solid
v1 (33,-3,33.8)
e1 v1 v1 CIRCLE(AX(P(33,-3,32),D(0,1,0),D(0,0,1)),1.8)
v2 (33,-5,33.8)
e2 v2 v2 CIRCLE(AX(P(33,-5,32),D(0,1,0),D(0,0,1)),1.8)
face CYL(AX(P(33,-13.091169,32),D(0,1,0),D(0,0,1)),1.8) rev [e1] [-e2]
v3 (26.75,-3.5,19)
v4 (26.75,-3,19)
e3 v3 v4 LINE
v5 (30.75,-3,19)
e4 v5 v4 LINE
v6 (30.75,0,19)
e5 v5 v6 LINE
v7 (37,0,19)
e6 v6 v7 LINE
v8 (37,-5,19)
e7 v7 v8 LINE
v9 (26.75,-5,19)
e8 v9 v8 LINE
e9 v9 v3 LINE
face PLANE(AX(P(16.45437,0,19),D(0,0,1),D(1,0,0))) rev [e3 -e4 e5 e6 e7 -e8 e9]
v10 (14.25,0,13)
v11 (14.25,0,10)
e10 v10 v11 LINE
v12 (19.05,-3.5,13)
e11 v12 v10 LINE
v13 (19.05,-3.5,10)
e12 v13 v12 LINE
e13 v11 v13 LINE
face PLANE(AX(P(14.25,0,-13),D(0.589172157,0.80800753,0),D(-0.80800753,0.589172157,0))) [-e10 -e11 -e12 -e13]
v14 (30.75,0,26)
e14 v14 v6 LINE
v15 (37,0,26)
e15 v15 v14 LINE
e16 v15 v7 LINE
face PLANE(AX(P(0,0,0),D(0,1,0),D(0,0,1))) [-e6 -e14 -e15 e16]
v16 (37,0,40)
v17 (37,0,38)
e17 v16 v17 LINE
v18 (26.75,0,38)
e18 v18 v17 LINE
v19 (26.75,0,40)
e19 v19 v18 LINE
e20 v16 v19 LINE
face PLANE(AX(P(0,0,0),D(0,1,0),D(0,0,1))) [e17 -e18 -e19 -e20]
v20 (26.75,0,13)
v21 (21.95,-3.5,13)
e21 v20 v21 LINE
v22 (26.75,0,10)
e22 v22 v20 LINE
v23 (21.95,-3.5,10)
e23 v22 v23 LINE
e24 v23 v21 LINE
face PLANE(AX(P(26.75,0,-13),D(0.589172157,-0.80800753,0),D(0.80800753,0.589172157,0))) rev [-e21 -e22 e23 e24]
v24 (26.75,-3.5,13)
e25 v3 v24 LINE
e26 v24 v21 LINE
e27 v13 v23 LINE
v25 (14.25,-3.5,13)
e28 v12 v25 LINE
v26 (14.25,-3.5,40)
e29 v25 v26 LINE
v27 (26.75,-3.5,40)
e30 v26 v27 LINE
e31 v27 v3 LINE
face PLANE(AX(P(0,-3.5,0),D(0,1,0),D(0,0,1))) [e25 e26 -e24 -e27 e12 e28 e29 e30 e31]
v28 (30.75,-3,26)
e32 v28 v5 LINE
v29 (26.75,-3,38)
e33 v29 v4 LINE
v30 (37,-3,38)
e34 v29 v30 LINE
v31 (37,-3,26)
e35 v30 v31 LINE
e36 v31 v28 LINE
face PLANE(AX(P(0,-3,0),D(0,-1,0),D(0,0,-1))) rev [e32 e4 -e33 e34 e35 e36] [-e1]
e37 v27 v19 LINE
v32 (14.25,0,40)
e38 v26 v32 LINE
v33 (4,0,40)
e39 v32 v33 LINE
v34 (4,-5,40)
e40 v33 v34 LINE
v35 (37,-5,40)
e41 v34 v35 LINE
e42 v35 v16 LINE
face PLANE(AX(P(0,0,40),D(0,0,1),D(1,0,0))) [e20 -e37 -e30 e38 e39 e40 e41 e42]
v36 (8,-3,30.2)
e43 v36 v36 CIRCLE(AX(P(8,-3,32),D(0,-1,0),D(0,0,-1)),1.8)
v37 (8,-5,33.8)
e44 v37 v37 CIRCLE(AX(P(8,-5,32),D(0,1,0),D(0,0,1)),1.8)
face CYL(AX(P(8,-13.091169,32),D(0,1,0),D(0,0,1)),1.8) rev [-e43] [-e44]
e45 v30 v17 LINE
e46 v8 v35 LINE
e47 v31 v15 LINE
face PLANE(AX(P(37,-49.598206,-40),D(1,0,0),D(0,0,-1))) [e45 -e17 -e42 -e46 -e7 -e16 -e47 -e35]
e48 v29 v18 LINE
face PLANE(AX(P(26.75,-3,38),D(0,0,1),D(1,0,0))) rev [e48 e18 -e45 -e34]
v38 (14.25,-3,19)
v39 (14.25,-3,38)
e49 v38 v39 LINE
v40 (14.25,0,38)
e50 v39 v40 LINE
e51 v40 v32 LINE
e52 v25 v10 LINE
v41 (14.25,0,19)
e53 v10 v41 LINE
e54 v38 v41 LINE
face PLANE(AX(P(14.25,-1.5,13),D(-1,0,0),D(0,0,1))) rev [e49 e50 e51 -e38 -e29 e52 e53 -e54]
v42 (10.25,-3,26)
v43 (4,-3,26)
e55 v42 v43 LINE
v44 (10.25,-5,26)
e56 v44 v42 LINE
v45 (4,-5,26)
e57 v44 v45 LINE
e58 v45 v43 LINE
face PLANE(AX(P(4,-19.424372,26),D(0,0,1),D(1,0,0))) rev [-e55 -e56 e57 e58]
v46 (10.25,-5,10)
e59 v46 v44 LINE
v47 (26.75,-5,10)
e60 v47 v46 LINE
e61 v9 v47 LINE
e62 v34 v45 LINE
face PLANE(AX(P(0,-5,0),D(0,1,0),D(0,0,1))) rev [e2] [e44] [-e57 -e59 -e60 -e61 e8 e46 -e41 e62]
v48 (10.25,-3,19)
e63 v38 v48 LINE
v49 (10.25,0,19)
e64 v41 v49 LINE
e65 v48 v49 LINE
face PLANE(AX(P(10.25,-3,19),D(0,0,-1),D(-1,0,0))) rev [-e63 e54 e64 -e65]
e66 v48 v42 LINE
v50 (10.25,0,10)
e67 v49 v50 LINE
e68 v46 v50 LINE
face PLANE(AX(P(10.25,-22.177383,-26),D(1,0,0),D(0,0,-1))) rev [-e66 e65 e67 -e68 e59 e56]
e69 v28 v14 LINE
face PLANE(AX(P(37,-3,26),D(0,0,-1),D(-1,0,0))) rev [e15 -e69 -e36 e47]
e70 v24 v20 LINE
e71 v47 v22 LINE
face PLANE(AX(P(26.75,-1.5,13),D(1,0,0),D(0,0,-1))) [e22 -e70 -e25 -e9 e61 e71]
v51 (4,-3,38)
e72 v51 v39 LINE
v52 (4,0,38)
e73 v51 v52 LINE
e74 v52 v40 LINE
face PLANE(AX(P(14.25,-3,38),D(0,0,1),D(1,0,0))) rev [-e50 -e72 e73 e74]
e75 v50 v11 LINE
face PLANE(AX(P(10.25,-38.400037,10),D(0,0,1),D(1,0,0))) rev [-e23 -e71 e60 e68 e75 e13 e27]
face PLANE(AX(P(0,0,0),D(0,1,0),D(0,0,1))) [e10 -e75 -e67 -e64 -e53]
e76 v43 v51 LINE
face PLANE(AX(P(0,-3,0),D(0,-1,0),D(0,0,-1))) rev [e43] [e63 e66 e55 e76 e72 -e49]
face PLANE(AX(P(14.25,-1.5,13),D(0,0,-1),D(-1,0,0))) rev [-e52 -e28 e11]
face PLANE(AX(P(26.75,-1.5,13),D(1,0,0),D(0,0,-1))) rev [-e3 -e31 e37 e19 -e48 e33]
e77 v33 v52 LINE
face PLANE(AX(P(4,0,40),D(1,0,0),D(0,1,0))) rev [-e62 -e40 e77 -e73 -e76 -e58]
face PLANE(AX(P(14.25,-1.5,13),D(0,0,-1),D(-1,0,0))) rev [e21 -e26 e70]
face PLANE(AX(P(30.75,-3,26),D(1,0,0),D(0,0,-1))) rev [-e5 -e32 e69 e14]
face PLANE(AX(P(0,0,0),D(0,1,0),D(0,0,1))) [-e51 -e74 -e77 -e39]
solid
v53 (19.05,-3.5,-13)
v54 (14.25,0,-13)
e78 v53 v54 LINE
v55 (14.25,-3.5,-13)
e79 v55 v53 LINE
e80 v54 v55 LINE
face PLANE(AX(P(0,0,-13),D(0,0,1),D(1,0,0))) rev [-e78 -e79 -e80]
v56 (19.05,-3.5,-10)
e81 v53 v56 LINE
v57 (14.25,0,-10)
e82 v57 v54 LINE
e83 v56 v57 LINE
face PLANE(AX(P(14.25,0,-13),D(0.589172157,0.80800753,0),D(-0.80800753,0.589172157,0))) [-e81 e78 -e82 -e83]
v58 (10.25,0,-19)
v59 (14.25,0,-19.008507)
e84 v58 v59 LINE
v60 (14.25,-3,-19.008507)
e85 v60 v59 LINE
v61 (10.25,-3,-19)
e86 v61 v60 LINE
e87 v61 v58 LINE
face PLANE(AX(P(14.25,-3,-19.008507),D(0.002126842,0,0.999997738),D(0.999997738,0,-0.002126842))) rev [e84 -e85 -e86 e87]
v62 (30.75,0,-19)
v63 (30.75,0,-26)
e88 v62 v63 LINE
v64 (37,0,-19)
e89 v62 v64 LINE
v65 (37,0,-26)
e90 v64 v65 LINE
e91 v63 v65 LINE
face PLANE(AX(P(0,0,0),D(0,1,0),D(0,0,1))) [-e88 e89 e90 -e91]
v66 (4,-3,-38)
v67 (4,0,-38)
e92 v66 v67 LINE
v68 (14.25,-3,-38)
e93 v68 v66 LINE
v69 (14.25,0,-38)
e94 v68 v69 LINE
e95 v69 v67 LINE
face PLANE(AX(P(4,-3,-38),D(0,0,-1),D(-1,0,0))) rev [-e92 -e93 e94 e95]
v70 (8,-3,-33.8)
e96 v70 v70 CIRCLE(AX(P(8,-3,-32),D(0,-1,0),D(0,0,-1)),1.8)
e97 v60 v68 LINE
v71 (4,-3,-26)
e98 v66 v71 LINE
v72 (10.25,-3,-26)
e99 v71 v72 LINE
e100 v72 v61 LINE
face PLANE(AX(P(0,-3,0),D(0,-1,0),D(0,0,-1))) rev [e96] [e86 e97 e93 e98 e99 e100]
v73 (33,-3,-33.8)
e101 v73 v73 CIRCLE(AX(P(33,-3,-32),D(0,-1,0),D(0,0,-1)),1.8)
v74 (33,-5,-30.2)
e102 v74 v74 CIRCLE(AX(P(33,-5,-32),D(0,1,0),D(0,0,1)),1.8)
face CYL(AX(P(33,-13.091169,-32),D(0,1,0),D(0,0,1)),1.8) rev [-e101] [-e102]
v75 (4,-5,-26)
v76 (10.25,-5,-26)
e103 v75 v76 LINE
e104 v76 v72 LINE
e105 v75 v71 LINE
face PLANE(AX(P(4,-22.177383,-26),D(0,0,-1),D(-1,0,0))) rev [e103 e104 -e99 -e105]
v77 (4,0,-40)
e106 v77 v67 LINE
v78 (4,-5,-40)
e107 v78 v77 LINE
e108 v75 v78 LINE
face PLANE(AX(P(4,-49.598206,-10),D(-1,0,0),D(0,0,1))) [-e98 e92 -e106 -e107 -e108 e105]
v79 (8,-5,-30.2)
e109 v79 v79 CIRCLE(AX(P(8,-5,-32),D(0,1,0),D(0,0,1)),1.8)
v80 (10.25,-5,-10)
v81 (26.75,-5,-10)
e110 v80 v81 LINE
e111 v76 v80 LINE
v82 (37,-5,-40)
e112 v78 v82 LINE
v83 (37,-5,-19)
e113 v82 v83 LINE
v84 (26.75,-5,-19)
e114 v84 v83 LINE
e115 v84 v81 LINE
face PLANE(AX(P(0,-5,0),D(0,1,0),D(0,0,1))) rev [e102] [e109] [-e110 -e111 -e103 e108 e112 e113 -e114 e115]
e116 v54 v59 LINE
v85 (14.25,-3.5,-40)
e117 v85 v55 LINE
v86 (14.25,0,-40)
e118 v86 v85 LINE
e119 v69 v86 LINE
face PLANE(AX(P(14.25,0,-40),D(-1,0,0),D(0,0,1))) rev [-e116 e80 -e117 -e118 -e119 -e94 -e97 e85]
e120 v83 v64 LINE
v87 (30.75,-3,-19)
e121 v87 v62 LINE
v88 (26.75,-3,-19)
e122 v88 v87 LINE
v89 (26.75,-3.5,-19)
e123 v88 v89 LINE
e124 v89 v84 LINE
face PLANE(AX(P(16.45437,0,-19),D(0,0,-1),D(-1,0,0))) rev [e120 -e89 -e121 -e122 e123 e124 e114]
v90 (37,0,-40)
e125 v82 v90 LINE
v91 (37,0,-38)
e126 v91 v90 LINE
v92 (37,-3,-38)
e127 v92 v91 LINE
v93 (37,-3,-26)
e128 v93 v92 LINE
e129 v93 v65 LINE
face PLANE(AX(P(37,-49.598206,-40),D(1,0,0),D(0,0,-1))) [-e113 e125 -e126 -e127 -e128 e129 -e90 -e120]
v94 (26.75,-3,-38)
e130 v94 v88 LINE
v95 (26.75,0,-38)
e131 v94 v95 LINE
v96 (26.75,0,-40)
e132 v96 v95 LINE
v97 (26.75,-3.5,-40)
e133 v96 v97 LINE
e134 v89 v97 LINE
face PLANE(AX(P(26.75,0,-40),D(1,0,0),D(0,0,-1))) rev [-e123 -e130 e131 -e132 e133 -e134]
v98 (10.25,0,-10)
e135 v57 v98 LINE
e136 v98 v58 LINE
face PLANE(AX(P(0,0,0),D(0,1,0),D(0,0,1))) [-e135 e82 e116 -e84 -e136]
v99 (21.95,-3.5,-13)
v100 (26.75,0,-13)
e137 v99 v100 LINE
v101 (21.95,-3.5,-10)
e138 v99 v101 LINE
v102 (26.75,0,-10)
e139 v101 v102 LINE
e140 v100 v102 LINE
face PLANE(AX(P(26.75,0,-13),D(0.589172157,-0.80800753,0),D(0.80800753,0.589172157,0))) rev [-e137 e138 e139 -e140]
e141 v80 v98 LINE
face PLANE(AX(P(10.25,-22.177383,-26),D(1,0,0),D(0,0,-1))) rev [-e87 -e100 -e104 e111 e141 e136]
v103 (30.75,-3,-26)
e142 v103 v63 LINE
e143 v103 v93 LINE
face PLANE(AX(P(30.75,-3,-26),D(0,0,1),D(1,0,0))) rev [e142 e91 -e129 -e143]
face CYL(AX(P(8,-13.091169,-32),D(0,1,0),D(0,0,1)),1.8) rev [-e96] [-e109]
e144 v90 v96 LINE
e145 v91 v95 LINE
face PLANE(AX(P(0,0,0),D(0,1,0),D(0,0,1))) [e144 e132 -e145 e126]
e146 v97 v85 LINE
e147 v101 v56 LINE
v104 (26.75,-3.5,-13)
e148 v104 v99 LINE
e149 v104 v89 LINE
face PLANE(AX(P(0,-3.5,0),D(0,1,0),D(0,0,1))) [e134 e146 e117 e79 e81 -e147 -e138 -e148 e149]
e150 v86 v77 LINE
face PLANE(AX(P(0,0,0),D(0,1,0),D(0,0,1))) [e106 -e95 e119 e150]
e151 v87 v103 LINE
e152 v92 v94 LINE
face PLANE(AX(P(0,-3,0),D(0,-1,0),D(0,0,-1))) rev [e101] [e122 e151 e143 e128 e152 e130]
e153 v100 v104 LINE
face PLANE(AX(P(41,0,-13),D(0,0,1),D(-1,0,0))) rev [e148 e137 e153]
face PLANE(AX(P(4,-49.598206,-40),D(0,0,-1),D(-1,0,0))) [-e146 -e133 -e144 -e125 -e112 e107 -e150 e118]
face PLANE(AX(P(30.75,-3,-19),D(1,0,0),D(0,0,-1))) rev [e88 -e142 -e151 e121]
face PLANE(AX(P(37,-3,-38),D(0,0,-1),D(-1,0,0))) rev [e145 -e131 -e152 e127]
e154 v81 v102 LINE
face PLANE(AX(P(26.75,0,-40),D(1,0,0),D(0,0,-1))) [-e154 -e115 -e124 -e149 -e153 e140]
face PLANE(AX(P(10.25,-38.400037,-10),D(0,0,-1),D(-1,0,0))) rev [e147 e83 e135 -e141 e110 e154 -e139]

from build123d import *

# Parameters (mm, degrees)
SKETCH1_W                                = 33
SKETCH1_H                                = 30
BOSS_EXTRUDE4_DEPTH                      = 3
SKETCH13_W                               = 10.25
SKETCH13_H                               = 30
BOSS_EXTRUDE5_DEPTH                      = 2
SKETCH14_W                               = 12.5
SKETCH14_H                               = 30
CUT_EXTRUDE7_DEPTH                       = 1.5
BOSS_EXTRUDE6_DEPTH                      = 3
CUT_EXTRUDE12_REACH                      = 56.717
SKETCH25_W                               = 6.25
SKETCH25_H                               = 16
BOSS_EXTRUDE7_DEPTH                      = 23
SKETCH27_W                               = 33
SKETCH27_H                               = 5
BOSS_EXTRUDE8_DEPTH                      = 27
CUT_EXTRUDE13_REACH                      = 56.717
SKETCH28_W                               = 6.25
SKETCH28_H                               = 13
CUT_EXTRUDE16_REACH                      = 56.717
SKETCH29_W                               = 26.75
SKETCH29_H                               = 20
SKETCH30_W                               = 12.5
SKETCH30_H                               = 27
CUT_EXTRUDE17_DEPTH                      = 1.5
CUT_EXTRUDE18_DEPTH                      = 3
CUT_EXTRUDE19_DEPTH                      = 3
SKETCH33_R                               = 1.8
CUT_EXTRUDE20_DEPTH                      = 8
CBORE_START                              = -2.4
CBORE_FOR_M3_PAN_HEAD_SCREW1_OUTLINE_R   = 3.5
CBORE_FOR_M3_PAN_HEAD_SCREW1_DEPTH       = 2.4
CBORE_START_2                            = -5
CBORE_FOR_M3_PAN_HEAD_SCREW1_2_OUTLINE_R = 1.8
CBORE_FOR_M3_PAN_HEAD_SCREW1_2_DEPTH     = 2.6
CUT_EXTRUDE22_DEPTH                      = 1.5
SKETCH39_W                               = 12.5
SKETCH39_H                               = 27
CUT_EXTRUDE24_DEPTH                      = 0.5
SKETCH40_W                               = 9
SKETCH40_H                               = 5
CUT_EXTRUDE26_DEPTH                      = 10.25
SKETCH41_W                               = 9
SKETCH41_H                               = 5
CUT_EXTRUDE27_DEPTH                      = 10.25


# Read off the part's stored shape, not the designer's step: CBORE for M3 Pan Head Screw1
with BuildPart() as part:
    # Sketch1 → Boss-Extrude4 (new body)
    with BuildSketch(Plane(origin=(0, -2, 0), x_dir=(1, 0, 0), z_dir=(0, 1, 0))):
        with Locations((20.5, 25)):
            Rectangle(SKETCH1_W, SKETCH1_H)
    extrude(amount=-BOSS_EXTRUDE4_DEPTH)

    # Sketch13 → Boss-Extrude5 (add)
    with BuildSketch(Plane(origin=(0, -2, 0), x_dir=(1, 0, 0), z_dir=(0, 1, 0))):
        with Locations((9.125, 25)):
            Rectangle(SKETCH13_W, SKETCH13_H)
        with Locations((31.875, 25)):
            Rectangle(SKETCH13_W, SKETCH13_H)
    extrude(amount=BOSS_EXTRUDE5_DEPTH)

    # Sketch14 → Cut-Extrude7 (cut)
    with BuildSketch(Plane(origin=(0, -2, 0), x_dir=(1, 0, 0), z_dir=(0, 1, 0))):
        with Locations((20.5, 25)):
            Rectangle(SKETCH14_W, SKETCH14_H)
    extrude(amount=-CUT_EXTRUDE7_DEPTH, mode=Mode.SUBTRACT)

    # Sketch19 → Boss-Extrude6 (add)
    with BuildSketch(Plane.XY.offset(-10)):
        Polygon((14.25, 0), (19.05, -3.5), (14.25, -3.5), align=None)
    boss_extrude6 = extrude(amount=-BOSS_EXTRUDE6_DEPTH)

    # Mirror3: Boss-Extrude6 across plane
    add(boss_extrude6.mirror(Plane(origin=(20.5, 0, 0), x_dir=(0, 0, 1), z_dir=(1, 0, 0))))

    # Sketch25 → Cut-Extrude12 (cut, up to next)
    with BuildSketch(Plane(origin=(0, 0, 0), x_dir=(1, 0, 0), z_dir=(0, 1, 0)), mode=Mode.PRIVATE) as cut_extrude12_sk1:
        with Locations((7.125, 18)):
            Rectangle(SKETCH25_W, SKETCH25_H)
    cut_extrude12_tool1 = extrude(cut_extrude12_sk1.sketch, amount=-CUT_EXTRUDE12_REACH, mode=Mode.PRIVATE) & part.part
    add(cut_extrude12_tool1.solids().sort_by_distance((7.125, 0, -18))[0], mode=Mode.SUBTRACT)

    # Sketch26 → Boss-Extrude7 (add)
    with BuildSketch(Plane.XY.offset(-10)):
        Polygon((10.25, -5), (10.25, 0), (14.25, 0), (19.05, -3.5), (21.95, -3.5), (26.75, 0), (37, 0), (37, -5), align=None)
    extrude(amount=BOSS_EXTRUDE7_DEPTH)

    # Sketch27 → Boss-Extrude8 (add)
    with BuildSketch(Plane.XY.offset(13)):
        with Locations((20.5, -2.5)):
            Rectangle(SKETCH27_W, SKETCH27_H)
    extrude(amount=BOSS_EXTRUDE8_DEPTH)

    # Sketch28 → Cut-Extrude13 (cut, up to next)
    with BuildSketch(Plane(origin=(0, 0, 0), x_dir=(1, 0, 0), z_dir=(0, 1, 0)), mode=Mode.PRIVATE) as cut_extrude13_sk1:
        with Locations((7.125, -19.5)):
            Rectangle(SKETCH28_W, SKETCH28_H)
    cut_extrude13_tool1 = extrude(cut_extrude13_sk1.sketch, amount=-CUT_EXTRUDE13_REACH, mode=Mode.PRIVATE) & part.part
    add(cut_extrude13_tool1.solids().sort_by_distance((7.125, 0, 19.5))[0], mode=Mode.SUBTRACT)

    # Sketch29 → Cut-Extrude16 (cut, up to next)
    with BuildSketch(Plane(origin=(0, 0, 0), x_dir=(1, 0, 0), z_dir=(0, 1, 0)), mode=Mode.PRIVATE) as cut_extrude16_sk1:
        with Locations((23.625, 0)):
            Rectangle(SKETCH29_W, SKETCH29_H)
    cut_extrude16_tool1 = extrude(cut_extrude16_sk1.sketch, amount=-CUT_EXTRUDE16_REACH, mode=Mode.PRIVATE) & part.part
    add(cut_extrude16_tool1.solids().sort_by_distance((23.625, 0, 0))[0], mode=Mode.SUBTRACT)


with BuildPart() as cut_extrude16_piece_1:
    # of the separate pieces the step leaves, piece 1, a body of its own (cut_extrude16_pieces)
    add(part.part.solids().sort_by_distance((10.25, -5, 26))[0])

    # Sketch30 → Cut-Extrude17 (cut)
    with BuildSketch(Plane(origin=(0, 0, 0), x_dir=(1, 0, 0), z_dir=(0, 1, 0))):
        with Locations((20.5, -26.5)):
            Rectangle(SKETCH30_W, SKETCH30_H)
    extrude(amount=-CUT_EXTRUDE17_DEPTH, mode=Mode.SUBTRACT)

    # Sketch32 → Cut-Extrude19 (cut)
    with BuildSketch(Plane(origin=(0, 0, 0), x_dir=(1, 0, 0), z_dir=(0, 1, 0))):
        Polygon((4, -26), (10.25, -26), (10.25, -19), (14.25, -19), (14.25, -38), (4, -38), align=None)
        Polygon((37, -38), (37, -26), (30.75, -26), (30.75, -19), (26.75, -19), (26.75, -38), align=None)
    extrude(amount=-CUT_EXTRUDE19_DEPTH, mode=Mode.SUBTRACT)


with BuildPart() as cut_extrude16_piece_2:
    # of the separate pieces the step leaves, piece 2, a body of its own (cut_extrude16_pieces)
    add(part.part.solids().sort_by_distance((4, -5, -40))[0])

    # Sketch31 → Cut-Extrude18 (cut)
    with BuildSketch(Plane(origin=(0, 0, 0), x_dir=(1, 0, 0), z_dir=(0, 1, 0))):
        Polygon((4, 38), (14.25, 38), (14.25, 19.008507387), (10.25, 19), (10.25, 26), (4, 26), align=None)
        Polygon((30.75, 19), (26.75, 19), (26.75, 38), (37, 38), (37, 26), (30.75, 26), align=None)
    extrude(amount=-CUT_EXTRUDE18_DEPTH, mode=Mode.SUBTRACT)


with BuildPart() as cut_extrude20_tool:
    # Sketch33 → Cut-Extrude20 (new body)
    with BuildSketch(Plane(origin=(0, 0, 0), x_dir=(1, 0, 0), z_dir=(0, 1, 0))):
        with Locations(Location((8, 32, 0), (0, 0, 270))):
            Circle(SKETCH33_R)
        with Locations(Location((33, 32, 0), (0, 0, 270))):
            Circle(SKETCH33_R)
        with Locations(Location((33, -32, 0), (0, 0, 270))):
            Circle(SKETCH33_R)
        with Locations(Location((8, -32, 0), (0, 0, 270))):
            Circle(SKETCH33_R)
    extrude(amount=-CUT_EXTRUDE20_DEPTH)


with BuildPart() as cut_extrude16_piece_1_1:
    add(cut_extrude16_piece_1.part)

    # Cut-Extrude20: cut by cut_extrude20_tool
    add(cut_extrude20_tool.part, mode=Mode.SUBTRACT)


with BuildPart() as cut_extrude16_piece_2_1:
    add(cut_extrude16_piece_2.part)

    # Cut-Extrude20: cut by cut_extrude20_tool
    add(cut_extrude20_tool.part, mode=Mode.SUBTRACT)


with BuildPart() as cbore_for_m3_pan_head_screw1_tool:
    # CBORE for M3 Pan Head Screw1 outline → CBORE for M3 Pan Head Screw1 (new body)
    with BuildSketch(Plane(origin=(0, 0, 0), x_dir=(1, 0, 0), z_dir=(0, 1, 0)).offset(CBORE_START)):
        with Locations((32, -14.75)):
            Circle(CBORE_FOR_M3_PAN_HEAD_SCREW1_OUTLINE_R)
        with Locations((32, 14.75)):
            Circle(CBORE_FOR_M3_PAN_HEAD_SCREW1_OUTLINE_R)
    extrude(amount=CBORE_FOR_M3_PAN_HEAD_SCREW1_DEPTH)


with BuildPart() as cut_extrude16_piece_1_2:
    add(cut_extrude16_piece_1_1.part)

    # CBORE for M3 Pan Head Screw1: cut by cbore_for_m3_pan_head_screw1_tool
    add(cbore_for_m3_pan_head_screw1_tool.part, mode=Mode.SUBTRACT)


with BuildPart() as cut_extrude16_piece_2_2:
    add(cut_extrude16_piece_2_1.part)

    # CBORE for M3 Pan Head Screw1: cut by cbore_for_m3_pan_head_screw1_tool
    add(cbore_for_m3_pan_head_screw1_tool.part, mode=Mode.SUBTRACT)


with BuildPart() as cbore_for_m3_pan_head_screw1_2_tool:
    # CBORE for M3 Pan Head Screw1 2 outline → CBORE for M3 Pan Head Screw1 2 (new body)
    with BuildSketch(Plane(origin=(0, 0, 0), x_dir=(1, 0, 0), z_dir=(0, 1, 0)).offset(CBORE_START_2)):
        with Locations((32, -14.75)):
            Circle(CBORE_FOR_M3_PAN_HEAD_SCREW1_2_OUTLINE_R)
        with Locations((32, 14.75)):
            Circle(CBORE_FOR_M3_PAN_HEAD_SCREW1_2_OUTLINE_R)
    extrude(amount=CBORE_FOR_M3_PAN_HEAD_SCREW1_2_DEPTH)


with BuildPart() as cut_extrude16_piece_1_3:
    add(cut_extrude16_piece_1_2.part)

    # CBORE for M3 Pan Head Screw1 2: cut by cbore_for_m3_pan_head_screw1_2_tool
    add(cbore_for_m3_pan_head_screw1_2_tool.part, mode=Mode.SUBTRACT)

    # Sketch36 → Cut-Extrude22 (cut)
    with BuildSketch(Plane(origin=(0, -1.5, 0), x_dir=(1, 0, 0), z_dir=(0, 1, 0))):
        Polygon((26.75, -13), (26.75, -38), (26.75, -40), (14.25, -40), (14.25, -38), (14.25, -13), (19.05, -13), (19.05, -10), (21.95, -10), (21.95, -13), align=None)
    extrude(amount=-CUT_EXTRUDE22_DEPTH, mode=Mode.SUBTRACT)

    # Sketch39 → Cut-Extrude24 (cut)
    with BuildSketch(Plane(origin=(0, -3, 0), x_dir=(1, 0, 0), z_dir=(0, 1, 0))):
        with Locations((20.5, -26.5)):
            Rectangle(SKETCH39_W, SKETCH39_H)
    extrude(amount=-CUT_EXTRUDE24_DEPTH, mode=Mode.SUBTRACT)

    # Sketch40 → Cut-Extrude26 (cut)
    with BuildSketch(Plane(origin=(37, 0, 0), x_dir=(0, 0, -1), z_dir=(1, 0, 0))):
        with Locations((-14.5, -2.5)):
            Rectangle(SKETCH40_W, SKETCH40_H)
    extrude(amount=-CUT_EXTRUDE26_DEPTH, mode=Mode.SUBTRACT)


with BuildPart() as cut_extrude16_piece_2_3:
    add(cut_extrude16_piece_2_2.part)

    # CBORE for M3 Pan Head Screw1 2: cut by cbore_for_m3_pan_head_screw1_2_tool
    add(cbore_for_m3_pan_head_screw1_2_tool.part, mode=Mode.SUBTRACT)

    # Sketch41 → Cut-Extrude27 (cut)
    with BuildSketch(Plane(origin=(37, 0, 0), x_dir=(0, 0, -1), z_dir=(1, 0, 0))):
        with Locations((14.5, -2.5)):
            Rectangle(SKETCH41_W, SKETCH41_H)
    extrude(amount=-CUT_EXTRUDE27_DEPTH, mode=Mode.SUBTRACT)


solid = Compound([cut_extrude16_piece_1_3.part, cut_extrude16_piece_2_3.part])
